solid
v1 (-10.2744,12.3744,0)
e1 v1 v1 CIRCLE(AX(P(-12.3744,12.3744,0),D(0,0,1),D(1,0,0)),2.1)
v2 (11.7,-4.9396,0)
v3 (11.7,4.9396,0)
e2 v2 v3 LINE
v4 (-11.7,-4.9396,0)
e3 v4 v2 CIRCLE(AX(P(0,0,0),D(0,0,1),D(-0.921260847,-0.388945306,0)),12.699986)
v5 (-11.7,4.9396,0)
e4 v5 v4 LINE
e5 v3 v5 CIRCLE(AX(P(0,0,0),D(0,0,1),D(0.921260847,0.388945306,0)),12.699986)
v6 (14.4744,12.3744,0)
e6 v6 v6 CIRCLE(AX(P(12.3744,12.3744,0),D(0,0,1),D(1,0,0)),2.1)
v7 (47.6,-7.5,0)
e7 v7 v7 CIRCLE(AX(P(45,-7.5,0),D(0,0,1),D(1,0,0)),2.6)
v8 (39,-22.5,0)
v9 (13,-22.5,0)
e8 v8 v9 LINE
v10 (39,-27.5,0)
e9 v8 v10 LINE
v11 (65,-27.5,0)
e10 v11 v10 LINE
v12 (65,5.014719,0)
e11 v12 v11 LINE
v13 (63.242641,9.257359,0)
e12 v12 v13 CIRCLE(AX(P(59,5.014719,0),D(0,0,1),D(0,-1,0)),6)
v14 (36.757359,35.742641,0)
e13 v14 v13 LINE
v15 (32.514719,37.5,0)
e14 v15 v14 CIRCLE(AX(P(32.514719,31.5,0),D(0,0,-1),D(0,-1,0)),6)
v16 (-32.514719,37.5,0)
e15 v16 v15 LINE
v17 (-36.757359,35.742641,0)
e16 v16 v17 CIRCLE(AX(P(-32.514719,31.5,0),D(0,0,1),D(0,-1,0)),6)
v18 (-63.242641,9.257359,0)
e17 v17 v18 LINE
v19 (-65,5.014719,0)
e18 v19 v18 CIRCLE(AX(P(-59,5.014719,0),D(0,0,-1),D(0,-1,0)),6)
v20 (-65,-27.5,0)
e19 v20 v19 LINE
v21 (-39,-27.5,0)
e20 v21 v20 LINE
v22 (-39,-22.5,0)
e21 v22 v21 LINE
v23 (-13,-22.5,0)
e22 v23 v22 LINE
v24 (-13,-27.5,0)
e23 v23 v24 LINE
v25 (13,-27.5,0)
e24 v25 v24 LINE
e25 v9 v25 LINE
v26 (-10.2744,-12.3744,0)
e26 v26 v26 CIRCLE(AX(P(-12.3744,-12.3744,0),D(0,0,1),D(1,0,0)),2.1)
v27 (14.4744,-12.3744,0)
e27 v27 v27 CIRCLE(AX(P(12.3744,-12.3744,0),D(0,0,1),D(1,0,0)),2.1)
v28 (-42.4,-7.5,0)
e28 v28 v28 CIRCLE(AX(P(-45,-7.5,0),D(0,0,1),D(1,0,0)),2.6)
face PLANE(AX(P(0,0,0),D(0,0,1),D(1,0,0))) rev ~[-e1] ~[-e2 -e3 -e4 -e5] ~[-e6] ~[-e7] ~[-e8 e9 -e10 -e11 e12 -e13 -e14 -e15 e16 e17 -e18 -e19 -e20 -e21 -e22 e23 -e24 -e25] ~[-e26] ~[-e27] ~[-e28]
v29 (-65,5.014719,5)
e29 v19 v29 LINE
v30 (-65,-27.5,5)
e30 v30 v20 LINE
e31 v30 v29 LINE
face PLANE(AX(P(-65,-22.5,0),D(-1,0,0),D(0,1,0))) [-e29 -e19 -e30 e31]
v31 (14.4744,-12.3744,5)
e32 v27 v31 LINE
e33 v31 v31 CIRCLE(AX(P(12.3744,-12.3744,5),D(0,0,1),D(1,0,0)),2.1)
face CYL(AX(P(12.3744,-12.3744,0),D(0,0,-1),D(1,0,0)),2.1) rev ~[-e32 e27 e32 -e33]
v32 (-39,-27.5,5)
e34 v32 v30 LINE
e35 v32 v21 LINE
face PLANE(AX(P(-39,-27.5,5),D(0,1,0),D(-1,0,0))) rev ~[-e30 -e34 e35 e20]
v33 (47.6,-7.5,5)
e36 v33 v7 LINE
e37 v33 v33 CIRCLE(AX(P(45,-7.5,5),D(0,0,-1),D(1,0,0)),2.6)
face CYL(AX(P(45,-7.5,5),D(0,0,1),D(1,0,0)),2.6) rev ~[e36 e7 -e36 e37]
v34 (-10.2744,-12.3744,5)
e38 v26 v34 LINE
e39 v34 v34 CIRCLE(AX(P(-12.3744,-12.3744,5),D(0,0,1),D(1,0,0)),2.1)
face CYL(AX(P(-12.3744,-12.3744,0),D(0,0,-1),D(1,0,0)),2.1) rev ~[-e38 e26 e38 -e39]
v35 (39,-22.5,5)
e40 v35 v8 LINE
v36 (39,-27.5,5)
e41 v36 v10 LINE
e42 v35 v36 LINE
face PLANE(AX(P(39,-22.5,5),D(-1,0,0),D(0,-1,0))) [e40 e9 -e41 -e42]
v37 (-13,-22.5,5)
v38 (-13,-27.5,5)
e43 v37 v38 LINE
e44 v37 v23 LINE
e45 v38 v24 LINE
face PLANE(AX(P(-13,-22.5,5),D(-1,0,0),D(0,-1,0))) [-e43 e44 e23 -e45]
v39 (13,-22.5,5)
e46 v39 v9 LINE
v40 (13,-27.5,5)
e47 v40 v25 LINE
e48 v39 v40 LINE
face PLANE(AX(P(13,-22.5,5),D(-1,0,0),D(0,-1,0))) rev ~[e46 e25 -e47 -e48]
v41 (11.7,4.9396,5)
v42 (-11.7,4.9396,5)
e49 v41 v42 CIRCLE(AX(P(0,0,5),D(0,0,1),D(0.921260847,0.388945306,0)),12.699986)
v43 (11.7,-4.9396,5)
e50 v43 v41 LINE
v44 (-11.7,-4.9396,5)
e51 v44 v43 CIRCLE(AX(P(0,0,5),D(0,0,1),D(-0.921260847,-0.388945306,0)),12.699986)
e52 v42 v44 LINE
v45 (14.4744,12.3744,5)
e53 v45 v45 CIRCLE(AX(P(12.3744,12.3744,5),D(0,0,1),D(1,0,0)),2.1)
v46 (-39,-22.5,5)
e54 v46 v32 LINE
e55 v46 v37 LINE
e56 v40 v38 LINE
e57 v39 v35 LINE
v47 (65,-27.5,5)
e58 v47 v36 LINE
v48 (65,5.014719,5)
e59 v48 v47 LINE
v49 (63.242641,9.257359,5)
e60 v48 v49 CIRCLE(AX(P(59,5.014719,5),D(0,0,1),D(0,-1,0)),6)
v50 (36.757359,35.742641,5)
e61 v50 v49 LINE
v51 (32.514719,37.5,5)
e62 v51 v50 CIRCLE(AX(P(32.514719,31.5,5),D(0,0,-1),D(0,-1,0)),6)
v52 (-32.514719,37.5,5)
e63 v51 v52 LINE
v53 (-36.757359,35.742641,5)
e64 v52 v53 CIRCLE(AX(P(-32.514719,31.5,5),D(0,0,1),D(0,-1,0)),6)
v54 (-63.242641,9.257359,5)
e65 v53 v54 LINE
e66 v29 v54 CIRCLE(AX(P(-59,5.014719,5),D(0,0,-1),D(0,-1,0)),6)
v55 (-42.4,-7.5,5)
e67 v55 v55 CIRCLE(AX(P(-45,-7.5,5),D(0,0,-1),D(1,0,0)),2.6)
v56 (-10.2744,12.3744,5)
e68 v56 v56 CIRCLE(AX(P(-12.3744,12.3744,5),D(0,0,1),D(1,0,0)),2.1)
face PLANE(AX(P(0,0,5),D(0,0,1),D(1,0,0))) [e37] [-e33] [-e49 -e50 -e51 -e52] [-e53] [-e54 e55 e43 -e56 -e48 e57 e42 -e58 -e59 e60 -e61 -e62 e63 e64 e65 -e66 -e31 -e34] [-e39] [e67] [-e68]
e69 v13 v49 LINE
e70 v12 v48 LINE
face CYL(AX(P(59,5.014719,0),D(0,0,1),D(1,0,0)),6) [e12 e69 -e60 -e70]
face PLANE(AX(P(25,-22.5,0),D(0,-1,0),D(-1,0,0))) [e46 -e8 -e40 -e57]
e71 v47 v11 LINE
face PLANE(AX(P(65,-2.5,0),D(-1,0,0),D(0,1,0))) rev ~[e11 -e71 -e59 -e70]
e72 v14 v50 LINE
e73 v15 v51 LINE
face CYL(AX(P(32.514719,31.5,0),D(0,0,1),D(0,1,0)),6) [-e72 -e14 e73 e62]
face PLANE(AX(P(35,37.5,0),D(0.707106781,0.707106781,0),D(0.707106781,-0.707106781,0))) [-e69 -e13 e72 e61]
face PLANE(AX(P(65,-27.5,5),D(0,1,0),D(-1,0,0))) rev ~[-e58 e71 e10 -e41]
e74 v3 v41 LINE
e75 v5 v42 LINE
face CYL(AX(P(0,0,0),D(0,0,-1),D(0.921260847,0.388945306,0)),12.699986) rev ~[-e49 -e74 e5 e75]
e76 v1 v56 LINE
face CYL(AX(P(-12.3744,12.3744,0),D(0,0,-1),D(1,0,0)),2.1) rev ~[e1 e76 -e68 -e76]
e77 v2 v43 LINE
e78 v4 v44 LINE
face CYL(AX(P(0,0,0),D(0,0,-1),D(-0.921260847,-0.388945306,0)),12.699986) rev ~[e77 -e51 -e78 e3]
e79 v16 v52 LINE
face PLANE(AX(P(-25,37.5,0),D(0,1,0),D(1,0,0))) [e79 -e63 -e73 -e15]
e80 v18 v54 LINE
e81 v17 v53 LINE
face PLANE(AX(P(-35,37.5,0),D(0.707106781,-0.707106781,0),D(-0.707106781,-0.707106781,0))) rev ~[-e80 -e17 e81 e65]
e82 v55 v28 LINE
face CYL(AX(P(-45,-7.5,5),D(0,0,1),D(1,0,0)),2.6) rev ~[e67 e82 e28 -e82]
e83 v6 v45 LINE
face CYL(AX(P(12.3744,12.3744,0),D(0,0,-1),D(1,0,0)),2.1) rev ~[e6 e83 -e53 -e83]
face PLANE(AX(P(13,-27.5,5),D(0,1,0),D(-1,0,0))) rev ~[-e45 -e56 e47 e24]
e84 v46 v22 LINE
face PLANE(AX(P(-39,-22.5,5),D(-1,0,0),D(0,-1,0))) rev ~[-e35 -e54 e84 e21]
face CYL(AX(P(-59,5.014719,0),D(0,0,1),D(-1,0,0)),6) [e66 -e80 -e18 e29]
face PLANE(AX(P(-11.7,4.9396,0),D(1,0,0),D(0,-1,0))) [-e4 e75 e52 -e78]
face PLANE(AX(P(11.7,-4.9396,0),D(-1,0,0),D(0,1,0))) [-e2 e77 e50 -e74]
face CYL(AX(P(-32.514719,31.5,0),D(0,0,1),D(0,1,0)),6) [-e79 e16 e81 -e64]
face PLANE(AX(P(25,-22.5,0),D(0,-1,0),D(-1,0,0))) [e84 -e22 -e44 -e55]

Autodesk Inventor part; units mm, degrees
ref_plane "YZ Plane" through (0, 0, 0) normal (1, 0, 0) x (0, 1, 0)
ref_plane "XZ Plane" through (0, 0, 0) normal (0, 1, 0) x (-1, 0, 0)
ref_plane "XY Plane" through (0, 0, 0) normal (0, 0, 1) x (1, 0, 0)
sketch "스케치1" plane through (0, 0, 0) normal (0, 0, 1) x (1, 0, 0)
  circle A0 centre (0, 0) radius 21.2
  line L0 (25, -22.5) -> (25, 27.5)
  line L1 (-25, 27.5) -> (-25, -22.5)
  circle A1 centre (0, 0) radius 22.3
  line L2 (25, 27.5) -> (-25, 27.5)
  line L3 (-11.7, 4.9396) -> (-11.7, -4.9396)
  arc A2 (-11.7, -4.9396) -> (11.7, -4.9396) centre (0, 0) ccw
  line L4 (11.7, -4.9396) -> (11.7, 4.9396)
  arc A3 (11.7, 4.9396) -> (-11.7, 4.9396) centre (0, 0) ccw
  circle A4 centre (12.3744, -12.3744) radius 2.1
  circle A5 centre (12.3744, 12.3744) radius 2.1
  circle A6 centre (-12.3744, 12.3744) radius 2.1
  circle A7 centre (-12.3744, -12.3744) radius 2.1
  line L5 (50, -22.5) -> (-50, -22.5)
  line L6 (50, -22.5) -> (50, -2.5)
  line L7 (50, -2.5) -> (25, 27.5)
  line L8 (-50, -22.5) -> (-50, -2.5)
  line L9 (-50, -2.5) -> (-25, 27.5)
  line L10 (-50, -22.5) -> (-65, -22.5)
  line L11 (50, -22.5) -> (65, -22.5)
  line L12 (65, -22.5) -> (65, -2.5)
  line L13 (-65, -22.5) -> (-65, -2.5)
  line L14 (-65, -2.5) -> (-25, 27.5)
  line L15 (25, 27.5) -> (65, -2.5)
  line L16 (-65, -22.5) -> (-65, 7.5)
  line L17 (65, -22.5) -> (65, 7.5)
  line L18 (25, -22.5) -> (25, 37.5)
  line L19 (-25, -22.5) -> (-25, 37.5)
  line L20 (-25, 37.5) -> (-65, 7.5)
  line L21 (-25, 37.5) -> (25, 37.5)
  line L22 (25, 37.5) -> (65, 7.5)
  line L23 (-25, 37.5) -> (-35, 37.5)
  line L24 (-35, 37.5) -> (-65, 7.5)
  line L25 (25, 37.5) -> (35, 37.5)
  line L26 (35, 37.5) -> (65, 7.5)
  dimension "d17" = 360
  dimension "d29" = 20
  dimension "d30" = 20
  dimension "d33" = 15
  dimension "d34" = 15
  dimension "d35" = 30
  dimension "d36" = 30
  dimension "d37" = 60
  dimension "d38" = 60
  dimension "d39" = 10
  dimension "d40" = 10
extrude "판1" add sketch "스케치1" along normal blind 5 contours A0 | L5 L1 L2 L0 | L0 L7 L6 L5 | L15 L12 L11 L6 L7 | L18 L22 L17 L15 | L2 L19 L21 L18 | L5 L8 L9 L1 | L9 L8 L10 L13 L14 | L14 L16 L20 L19 | L25 L26 L22 | L20 L24 L23 | A1
fillet "모서리 라운드2" radius 6 4 edges at (-35, 37.5, 2.5) (-65, 7.5, 2.5) (35, 37.5, 2.5) (65, 7.5, 2.5)
sketch "스케치2" plane through (0, 0, 5) normal (0, 0, 1) x (1, 0, 0)
  line L0 (-65, -22.5) -> (-65, 5.0147) projected
  line L1 (-65, -22.5) -> (-60, -22.5)
  line L2 (65, -22.5) -> (-65, -22.5) projected
  line L3 (65, -22.5) -> (60, -22.5)
  line L4 (60, -22.5) -> (30, -22.5)
  line L5 (30, -22.5) -> (30, 7.5)
  line L6 (30, 7.5) -> (60, 7.5)
  line L7 (60, 7.5) -> (60, -22.5)
  line L8 (-60, -22.5) -> (-30, -22.5)
  line L9 (-30, -22.5) -> (-30, 7.5)
  line L10 (-30, 7.5) -> (-60, 7.5)
  line L11 (-60, 7.5) -> (-60, -22.5)
  line L12 (-60, -22.5) -> (-45, -22.5)
  line L13 (-45, -22.5) -> (-45, -7.5)
  line L14 (60, -22.5) -> (45, -22.5)
  line L15 (45, -22.5) -> (45, -7.5)
  circle A0 centre (45, -7.5) radius 2.6
  circle A1 centre (-45, -7.5) radius 2.6
  point P0 (0, 0)
  dimension "d42" = 5
  dimension "d43" = 5
  dimension "d44" = 30
  dimension "d45" = 30
  dimension "d46" = 30
  dimension "d47" = 30
  dimension "d48" = 15
  dimension "d49" = 5.2
  dimension "d50" = 5.2
extrude "돌출1" cut sketch "스케치2" against normal through all contours A0 | A1
sketch "스케치3" plane through (0, 0, 5) normal (0, 0, 1) x (1, 0, 0)
  line L0 (65, -22.5) -> (-65, -22.5) projected
  line L1 (-65, -22.5) -> (65, -22.5)
  line L2 (65, -22.5) -> (65, -27.5)
  line L3 (65, -27.5) -> (-65, -27.5)
  line L4 (-65, -27.5) -> (-65, -22.5)
  line L5 (-65, -22.5) -> (-39, -22.5)
  line L6 (-39, -22.5) -> (-13, -22.5)
  line L7 (-13, -22.5) -> (13, -22.5)
  line L8 (13, -22.5) -> (39, -22.5)
  line L9 (39, -22.5) -> (65, -22.5)
  line L10 (-39, -22.5) -> (-39, -27.5)
  line L11 (-13, -22.5) -> (-13, -27.5)
  line L12 (13, -22.5) -> (13, -27.5)
  line L13 (39, -22.5) -> (39, -27.5)
  point P0 (0, 0)
  dimension "d53" = 130
  dimension "d54" = 5
  dimension "d55" = 26
  dimension "d56" = 26
  dimension "d57" = 26
  dimension "d58" = 26
  dimension "d59" = 26
extrude "돌출2" add sketch "스케치3" against normal blind 5 contours L2 L3 L13 L0 | L12 L3 L11 L0 | L10 L3 L4 L0
equation "\"TransitionRadius\" = BendRadius"
equation "\"BendRadius\" = 5"
properties part number "motor_wall" material "알루미늄 6061"
